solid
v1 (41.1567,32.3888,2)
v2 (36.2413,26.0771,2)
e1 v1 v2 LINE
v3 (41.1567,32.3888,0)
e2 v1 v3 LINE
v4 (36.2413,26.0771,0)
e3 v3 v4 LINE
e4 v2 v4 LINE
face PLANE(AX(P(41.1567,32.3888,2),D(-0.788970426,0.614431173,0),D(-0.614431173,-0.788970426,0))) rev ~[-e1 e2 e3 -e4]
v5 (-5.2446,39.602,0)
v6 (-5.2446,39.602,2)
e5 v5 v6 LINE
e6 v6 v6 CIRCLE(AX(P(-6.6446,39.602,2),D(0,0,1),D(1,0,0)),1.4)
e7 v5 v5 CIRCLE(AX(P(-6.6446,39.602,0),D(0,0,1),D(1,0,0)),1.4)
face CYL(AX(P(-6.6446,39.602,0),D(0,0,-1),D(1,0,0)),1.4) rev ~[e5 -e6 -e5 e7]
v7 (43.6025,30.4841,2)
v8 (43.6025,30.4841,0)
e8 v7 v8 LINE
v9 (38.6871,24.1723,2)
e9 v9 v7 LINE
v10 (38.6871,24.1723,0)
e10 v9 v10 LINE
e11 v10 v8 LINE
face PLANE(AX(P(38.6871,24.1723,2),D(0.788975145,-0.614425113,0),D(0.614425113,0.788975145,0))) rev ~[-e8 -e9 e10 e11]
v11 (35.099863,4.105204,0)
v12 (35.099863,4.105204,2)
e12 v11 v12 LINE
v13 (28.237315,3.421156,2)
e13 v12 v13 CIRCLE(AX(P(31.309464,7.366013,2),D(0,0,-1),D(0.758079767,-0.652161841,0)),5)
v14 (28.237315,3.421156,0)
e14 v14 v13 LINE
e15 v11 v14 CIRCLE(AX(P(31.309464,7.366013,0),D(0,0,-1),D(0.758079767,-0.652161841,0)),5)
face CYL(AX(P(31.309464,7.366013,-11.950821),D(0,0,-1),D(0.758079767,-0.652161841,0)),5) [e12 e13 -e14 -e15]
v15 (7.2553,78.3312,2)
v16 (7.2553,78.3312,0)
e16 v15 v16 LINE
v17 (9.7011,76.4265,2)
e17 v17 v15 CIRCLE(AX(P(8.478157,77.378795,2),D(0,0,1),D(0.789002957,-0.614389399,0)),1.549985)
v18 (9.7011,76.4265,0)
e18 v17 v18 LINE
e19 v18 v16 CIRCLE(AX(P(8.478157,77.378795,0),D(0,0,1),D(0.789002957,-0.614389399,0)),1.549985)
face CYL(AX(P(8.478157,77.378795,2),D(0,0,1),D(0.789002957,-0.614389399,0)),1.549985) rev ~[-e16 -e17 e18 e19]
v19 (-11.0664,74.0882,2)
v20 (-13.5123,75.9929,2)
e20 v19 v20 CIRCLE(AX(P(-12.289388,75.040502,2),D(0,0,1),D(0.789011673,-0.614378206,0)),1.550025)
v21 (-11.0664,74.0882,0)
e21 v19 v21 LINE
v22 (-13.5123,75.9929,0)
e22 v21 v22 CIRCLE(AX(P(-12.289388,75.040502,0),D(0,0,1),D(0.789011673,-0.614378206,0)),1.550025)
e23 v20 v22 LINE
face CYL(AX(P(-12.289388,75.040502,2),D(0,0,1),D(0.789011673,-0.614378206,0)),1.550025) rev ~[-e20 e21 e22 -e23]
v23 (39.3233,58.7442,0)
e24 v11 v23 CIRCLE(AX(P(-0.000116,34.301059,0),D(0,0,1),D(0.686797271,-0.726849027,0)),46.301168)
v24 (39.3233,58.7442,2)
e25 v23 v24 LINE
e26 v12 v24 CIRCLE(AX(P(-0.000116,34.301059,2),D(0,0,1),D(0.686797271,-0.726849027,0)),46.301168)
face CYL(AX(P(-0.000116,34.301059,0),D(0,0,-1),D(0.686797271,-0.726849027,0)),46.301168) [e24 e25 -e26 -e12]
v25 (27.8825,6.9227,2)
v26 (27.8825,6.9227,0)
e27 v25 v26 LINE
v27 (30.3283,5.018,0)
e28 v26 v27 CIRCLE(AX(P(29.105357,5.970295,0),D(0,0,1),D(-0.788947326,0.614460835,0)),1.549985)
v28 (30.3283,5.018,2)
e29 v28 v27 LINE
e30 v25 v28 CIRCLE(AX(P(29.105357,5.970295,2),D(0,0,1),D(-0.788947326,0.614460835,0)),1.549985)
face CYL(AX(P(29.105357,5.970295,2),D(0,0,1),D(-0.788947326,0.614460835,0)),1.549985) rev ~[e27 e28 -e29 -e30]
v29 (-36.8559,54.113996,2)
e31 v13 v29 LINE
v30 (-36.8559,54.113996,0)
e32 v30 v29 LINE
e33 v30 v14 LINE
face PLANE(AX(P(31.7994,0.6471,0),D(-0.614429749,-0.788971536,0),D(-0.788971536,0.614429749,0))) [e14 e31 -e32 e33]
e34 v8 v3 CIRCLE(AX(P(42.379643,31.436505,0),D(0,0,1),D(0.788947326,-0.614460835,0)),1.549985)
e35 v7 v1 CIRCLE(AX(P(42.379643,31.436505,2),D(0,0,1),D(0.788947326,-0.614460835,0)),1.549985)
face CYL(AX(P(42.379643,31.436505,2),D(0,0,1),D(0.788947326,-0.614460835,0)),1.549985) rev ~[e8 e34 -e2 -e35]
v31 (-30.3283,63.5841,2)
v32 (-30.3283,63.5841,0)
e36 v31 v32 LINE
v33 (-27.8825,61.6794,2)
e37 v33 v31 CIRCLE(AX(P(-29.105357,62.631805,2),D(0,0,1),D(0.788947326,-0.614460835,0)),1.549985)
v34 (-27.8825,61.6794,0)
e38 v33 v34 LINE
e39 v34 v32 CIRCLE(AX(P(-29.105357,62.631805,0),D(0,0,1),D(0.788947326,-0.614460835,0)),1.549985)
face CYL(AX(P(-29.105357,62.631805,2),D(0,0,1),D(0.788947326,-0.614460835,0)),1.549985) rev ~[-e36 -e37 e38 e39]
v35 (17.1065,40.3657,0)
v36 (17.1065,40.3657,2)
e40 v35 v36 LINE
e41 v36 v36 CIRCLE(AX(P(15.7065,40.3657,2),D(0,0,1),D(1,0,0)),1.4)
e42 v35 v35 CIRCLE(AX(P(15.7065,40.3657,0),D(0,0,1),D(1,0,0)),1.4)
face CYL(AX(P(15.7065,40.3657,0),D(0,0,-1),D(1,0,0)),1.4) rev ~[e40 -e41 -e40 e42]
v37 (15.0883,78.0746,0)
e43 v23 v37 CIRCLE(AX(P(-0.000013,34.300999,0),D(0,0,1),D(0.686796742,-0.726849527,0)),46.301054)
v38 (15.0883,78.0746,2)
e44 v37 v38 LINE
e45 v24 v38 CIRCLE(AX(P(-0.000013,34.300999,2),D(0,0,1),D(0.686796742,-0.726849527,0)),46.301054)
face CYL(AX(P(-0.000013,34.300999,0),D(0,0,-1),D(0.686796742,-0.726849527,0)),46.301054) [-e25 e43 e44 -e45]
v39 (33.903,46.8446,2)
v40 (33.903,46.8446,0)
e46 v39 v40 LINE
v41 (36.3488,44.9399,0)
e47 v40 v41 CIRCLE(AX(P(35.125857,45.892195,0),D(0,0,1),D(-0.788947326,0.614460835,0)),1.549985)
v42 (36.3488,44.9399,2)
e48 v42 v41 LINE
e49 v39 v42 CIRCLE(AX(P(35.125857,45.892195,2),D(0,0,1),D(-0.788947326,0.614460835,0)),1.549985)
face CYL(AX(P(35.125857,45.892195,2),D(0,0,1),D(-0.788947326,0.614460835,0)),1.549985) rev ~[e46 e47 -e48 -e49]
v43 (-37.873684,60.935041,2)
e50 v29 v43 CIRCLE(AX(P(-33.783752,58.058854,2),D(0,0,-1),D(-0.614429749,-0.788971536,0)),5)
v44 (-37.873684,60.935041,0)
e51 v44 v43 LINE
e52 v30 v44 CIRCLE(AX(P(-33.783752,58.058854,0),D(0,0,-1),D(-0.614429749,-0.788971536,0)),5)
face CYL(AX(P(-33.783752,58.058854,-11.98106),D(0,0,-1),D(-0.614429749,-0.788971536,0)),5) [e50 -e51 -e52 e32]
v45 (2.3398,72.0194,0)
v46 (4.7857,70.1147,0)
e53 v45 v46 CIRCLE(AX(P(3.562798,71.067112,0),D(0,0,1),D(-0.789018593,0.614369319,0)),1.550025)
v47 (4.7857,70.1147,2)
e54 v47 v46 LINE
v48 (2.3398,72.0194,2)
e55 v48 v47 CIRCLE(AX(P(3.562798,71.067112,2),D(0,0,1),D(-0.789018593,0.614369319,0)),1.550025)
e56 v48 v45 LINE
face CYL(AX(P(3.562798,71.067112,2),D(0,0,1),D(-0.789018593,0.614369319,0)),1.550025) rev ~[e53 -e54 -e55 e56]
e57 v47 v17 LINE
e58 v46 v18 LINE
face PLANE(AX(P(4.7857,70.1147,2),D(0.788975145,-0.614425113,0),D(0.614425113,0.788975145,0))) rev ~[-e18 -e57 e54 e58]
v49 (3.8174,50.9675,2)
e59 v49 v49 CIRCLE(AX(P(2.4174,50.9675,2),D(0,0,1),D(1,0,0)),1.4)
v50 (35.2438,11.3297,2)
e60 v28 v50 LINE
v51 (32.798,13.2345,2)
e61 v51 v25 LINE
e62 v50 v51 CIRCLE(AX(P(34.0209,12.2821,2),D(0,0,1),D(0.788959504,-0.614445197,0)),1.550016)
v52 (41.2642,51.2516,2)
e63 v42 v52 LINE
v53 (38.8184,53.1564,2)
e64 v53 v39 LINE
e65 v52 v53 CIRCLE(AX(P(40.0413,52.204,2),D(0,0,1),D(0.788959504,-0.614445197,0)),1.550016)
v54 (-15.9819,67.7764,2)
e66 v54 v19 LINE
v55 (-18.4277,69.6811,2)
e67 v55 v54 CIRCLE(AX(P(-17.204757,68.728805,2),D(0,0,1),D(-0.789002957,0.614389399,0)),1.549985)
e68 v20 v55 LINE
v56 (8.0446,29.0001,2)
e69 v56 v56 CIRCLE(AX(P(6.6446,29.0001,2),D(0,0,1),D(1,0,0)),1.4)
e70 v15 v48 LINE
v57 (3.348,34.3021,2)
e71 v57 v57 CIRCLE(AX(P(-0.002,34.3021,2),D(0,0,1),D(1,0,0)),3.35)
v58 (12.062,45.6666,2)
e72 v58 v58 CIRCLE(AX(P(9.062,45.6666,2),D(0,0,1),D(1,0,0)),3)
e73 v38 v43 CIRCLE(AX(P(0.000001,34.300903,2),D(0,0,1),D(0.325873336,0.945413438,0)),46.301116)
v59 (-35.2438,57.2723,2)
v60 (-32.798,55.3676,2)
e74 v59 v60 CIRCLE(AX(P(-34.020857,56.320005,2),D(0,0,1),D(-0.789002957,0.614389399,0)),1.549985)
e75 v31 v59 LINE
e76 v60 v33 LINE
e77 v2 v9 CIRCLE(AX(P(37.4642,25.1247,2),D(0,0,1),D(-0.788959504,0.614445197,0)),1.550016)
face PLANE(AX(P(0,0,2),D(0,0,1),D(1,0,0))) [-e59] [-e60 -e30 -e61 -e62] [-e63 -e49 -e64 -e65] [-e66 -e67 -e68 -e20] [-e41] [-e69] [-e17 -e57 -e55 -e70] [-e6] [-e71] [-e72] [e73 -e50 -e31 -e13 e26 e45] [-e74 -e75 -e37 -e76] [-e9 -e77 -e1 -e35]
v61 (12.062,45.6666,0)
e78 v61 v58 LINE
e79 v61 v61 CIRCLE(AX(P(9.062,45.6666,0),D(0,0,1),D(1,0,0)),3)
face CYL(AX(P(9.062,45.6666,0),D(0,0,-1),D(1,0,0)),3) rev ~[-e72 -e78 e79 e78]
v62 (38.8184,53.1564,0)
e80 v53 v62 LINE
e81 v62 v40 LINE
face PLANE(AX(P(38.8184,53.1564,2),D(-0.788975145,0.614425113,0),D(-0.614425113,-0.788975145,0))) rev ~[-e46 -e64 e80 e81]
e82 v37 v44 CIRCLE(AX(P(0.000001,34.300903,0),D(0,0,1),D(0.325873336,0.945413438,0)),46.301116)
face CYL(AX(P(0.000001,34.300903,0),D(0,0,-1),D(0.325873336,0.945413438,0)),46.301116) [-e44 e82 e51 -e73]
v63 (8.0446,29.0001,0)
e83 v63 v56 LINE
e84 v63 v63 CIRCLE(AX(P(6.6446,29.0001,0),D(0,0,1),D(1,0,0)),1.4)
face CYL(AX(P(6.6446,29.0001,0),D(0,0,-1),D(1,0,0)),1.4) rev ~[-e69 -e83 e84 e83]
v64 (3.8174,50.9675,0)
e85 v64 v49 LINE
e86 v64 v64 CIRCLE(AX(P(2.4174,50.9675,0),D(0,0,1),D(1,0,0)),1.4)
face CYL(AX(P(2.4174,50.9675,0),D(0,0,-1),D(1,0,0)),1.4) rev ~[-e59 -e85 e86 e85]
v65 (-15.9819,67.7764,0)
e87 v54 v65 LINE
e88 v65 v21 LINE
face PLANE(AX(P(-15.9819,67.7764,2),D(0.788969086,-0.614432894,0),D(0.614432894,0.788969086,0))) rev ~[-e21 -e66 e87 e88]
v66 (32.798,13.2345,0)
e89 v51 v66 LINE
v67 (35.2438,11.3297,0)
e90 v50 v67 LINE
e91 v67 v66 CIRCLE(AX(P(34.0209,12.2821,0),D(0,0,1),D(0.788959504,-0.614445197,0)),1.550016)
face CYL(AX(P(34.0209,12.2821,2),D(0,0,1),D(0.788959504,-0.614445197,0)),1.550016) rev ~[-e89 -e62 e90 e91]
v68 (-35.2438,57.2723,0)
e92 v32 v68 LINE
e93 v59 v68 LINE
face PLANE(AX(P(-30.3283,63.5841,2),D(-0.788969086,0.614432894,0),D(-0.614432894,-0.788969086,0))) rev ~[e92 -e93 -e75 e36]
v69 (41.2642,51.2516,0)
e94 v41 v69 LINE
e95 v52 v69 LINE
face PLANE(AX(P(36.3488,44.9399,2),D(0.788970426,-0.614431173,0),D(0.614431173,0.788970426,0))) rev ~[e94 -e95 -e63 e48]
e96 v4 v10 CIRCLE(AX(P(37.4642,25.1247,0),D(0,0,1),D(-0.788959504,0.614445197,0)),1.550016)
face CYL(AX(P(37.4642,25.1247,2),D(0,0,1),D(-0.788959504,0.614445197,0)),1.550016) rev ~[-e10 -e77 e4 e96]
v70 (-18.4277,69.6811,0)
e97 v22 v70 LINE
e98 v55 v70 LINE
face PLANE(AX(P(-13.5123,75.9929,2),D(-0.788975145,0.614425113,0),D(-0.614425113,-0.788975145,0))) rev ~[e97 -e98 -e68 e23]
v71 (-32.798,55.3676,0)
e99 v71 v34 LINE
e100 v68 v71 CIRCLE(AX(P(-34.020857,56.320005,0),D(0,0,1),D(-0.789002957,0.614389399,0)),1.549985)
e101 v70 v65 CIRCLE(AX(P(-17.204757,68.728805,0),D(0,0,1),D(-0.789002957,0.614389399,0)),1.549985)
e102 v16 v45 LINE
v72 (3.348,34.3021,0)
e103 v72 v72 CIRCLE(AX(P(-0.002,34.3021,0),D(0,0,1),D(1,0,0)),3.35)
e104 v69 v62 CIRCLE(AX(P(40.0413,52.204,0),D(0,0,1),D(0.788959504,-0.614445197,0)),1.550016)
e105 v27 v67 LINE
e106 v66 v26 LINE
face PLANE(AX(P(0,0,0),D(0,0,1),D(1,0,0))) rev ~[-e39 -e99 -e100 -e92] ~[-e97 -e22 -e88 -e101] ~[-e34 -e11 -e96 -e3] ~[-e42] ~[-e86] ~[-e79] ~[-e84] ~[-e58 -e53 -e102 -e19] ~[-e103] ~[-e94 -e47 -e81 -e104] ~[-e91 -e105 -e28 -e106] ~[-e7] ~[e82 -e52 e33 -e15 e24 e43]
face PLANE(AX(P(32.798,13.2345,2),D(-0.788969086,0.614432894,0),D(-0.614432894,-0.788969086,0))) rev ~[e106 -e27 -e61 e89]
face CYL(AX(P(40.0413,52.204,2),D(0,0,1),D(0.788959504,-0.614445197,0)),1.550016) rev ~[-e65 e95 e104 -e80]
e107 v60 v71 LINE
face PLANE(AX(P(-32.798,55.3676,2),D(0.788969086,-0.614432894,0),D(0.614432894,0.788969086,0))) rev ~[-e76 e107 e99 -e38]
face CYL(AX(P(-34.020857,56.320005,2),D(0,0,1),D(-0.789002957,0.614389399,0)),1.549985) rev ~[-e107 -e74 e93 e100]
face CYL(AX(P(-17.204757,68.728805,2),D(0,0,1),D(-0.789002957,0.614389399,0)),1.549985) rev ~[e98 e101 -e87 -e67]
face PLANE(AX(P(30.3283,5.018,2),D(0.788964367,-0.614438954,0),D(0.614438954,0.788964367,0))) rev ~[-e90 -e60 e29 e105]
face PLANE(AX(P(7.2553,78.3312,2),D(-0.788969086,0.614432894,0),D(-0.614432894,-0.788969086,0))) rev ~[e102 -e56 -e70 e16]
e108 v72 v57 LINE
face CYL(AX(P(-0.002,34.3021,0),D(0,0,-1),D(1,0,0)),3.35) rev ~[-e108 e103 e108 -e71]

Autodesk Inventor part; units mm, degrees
ref_plane "YZ Plane" through (0, 0, 0) normal (1, 0, 0) x (0, 1, 0)
ref_plane "XZ Plane" through (0, 0, 0) normal (0, 1, 0) x (-1, 0, 0)
ref_plane "XY Plane" through (0, 0, 0) normal (0, 0, 1) x (1, 0, 0)
ref_plane "Arbeitsebene1" through (0, 0, 0) normal (0, 0, 1) x (1, 0, 0)
sketch "Skizze1" plane through (0, 0, 0) normal (0, 0, 1) x (1, 0, 0)
  line L0 (39.3233, 58.7442) -> (31.1975, 48.5587) projected
  arc A0 (20.3661, 6.7006) -> (31.1975, 48.5587) centre (0, 34.301) ccw projected
  line L1 (20.3661, 6.7006) -> (24.3422, 1.3125) projected
  arc A1 (24.3422, 1.3125) -> (31.7994, 0.6471) centre (28.3654, 4.2814) ccw projected
  arc A2 (31.7994, 0.6471) -> (39.3233, 58.7442) centre (0, 34.301) ccw projected
  circle A3 centre (37.5836, 49.0481) radius 1.4 projected
  circle A4 centre (39.9219, 28.2806) radius 1.4 projected
  circle A5 centre (31.5631, 9.1262) radius 1.4 projected
  line L2 (6.9617, 67.8882) -> (15.0883, 78.0746) projected
  arc A6 (15.0883, 78.0746) -> (-39.8826, 57.8205) centre (0, 34.301) ccw projected
  arc A7 (-39.8826, 57.8205) -> (-37.5755, 50.698) centre (-35.5757, 55.2807) ccw projected
  line L3 (-37.5755, 50.698) -> (-31.4381, 48.0198) projected
  arc A8 (6.9617, 67.8882) -> (-31.4381, 48.0198) centre (0, 34.301) ccw projected
  circle A9 centre (-31.5631, 59.4759) radius 1.4 projected
  circle A10 centre (-14.7471, 71.8847) radius 1.4 projected
  circle A11 centre (6.0205, 74.2229) radius 1.4 projected
  circle A12 centre (-0.002, 34.3021) radius 3.35 projected
  circle A13 centre (9.062, 45.6666) radius 3 projected
  circle A14 centre (2.4174, 50.9675) radius 1.9 projected
  circle A15 centre (15.7065, 40.3657) radius 1.9 projected
  circle A16 centre (6.6446, 29.0001) radius 1.9 projected
  circle A17 centre (-6.6446, 39.602) radius 1.9 projected
  line L4 (31.7994, 0.6471) -> (-40.3324, 56.8214)
  arc A18 (20.3661, 6.7006) -> (-31.4381, 48.0198) centre (0, 34.301) ccw projected
  arc A19 (31.7994, 0.6471) -> (-39.8826, 57.8205) centre (0, 34.301) ccw projected
  circle A20 centre (15.7065, 40.3657) radius 1.4
  circle A21 centre (6.6446, 29.0001) radius 1.4
  circle A22 centre (-6.6446, 39.602) radius 1.4
  circle A23 centre (2.4174, 50.9675) radius 1.4
  point P0 (0, 0)
  dimension "d2" = 2.8
  dimension "d3" = 2.8
  dimension "d4" = 2.8
  dimension "d5" = 2.8
extrude "Extrusion1" add sketch "Skizze1" along normal blind 2 contours A2 L4 A0 L0 | L0 A18 L2 A19 | A0 L4 A8 A18 | L2 A8 L4 A7 A6 | A14 | A15 | A16 | A17
sketch "Skizze2" plane through (0, 0, 2) normal (0, 0, 1) x (1, 0, 0)
  arc A0 (31.7994, 0.6471) -> (-39.8826, 57.8205) centre (0, 34.301) ccw projected
  arc A1 (-39.8826, 57.8205) -> (-40.3324, 56.8214) centre (-35.5757, 55.2807) ccw projected
  line L0 (-40.3324, 56.8214) -> (31.7994, 0.6471) projected
  circle A2 centre (31.5631, 9.1262) radius 1.4 projected
  circle A3 centre (39.9219, 28.2806) radius 1.4 projected
  circle A4 centre (37.5836, 49.0481) radius 1.4 projected
  circle A5 centre (-31.5631, 59.4759) radius 1.4 projected
  circle A6 centre (-14.7471, 71.8847) radius 1.4 projected
  circle A7 centre (6.0205, 74.2229) radius 1.4 projected
  circle A8 centre (9.062, 45.6666) radius 3 projected
  circle A9 centre (-0.002, 34.3021) radius 3.35 projected
  circle A10 centre (15.7065, 40.3657) radius 1.4 projected
  circle A11 centre (2.4174, 50.9675) radius 1.4 projected
  circle A12 centre (-6.6446, 39.602) radius 1.4 projected
  circle A13 centre (6.6446, 29.0001) radius 1.4 projected
  line L1 (29.1054, 5.9703) -> (34.0209, 12.2821) construction
  circle A14 centre (31.5631, 9.1262) radius 1.4 projected
  line L2 (30.3283, 5.018) -> (35.2438, 11.3297)
  line L3 (32.798, 13.2345) -> (27.8825, 6.9227)
  arc A15 (27.8825, 6.9227) -> (30.3283, 5.018) centre (29.1054, 5.9703) ccw
  arc A16 (35.2438, 11.3297) -> (32.798, 13.2345) centre (34.0209, 12.2821) ccw
  line L4 (37.4642, 25.1247) -> (42.3796, 31.4365) construction
  line L5 (38.6871, 24.1723) -> (43.6025, 30.4841)
  line L6 (41.1567, 32.3888) -> (36.2413, 26.0771)
  arc A17 (36.2413, 26.0771) -> (38.6871, 24.1723) centre (37.4642, 25.1247) ccw
  arc A18 (43.6025, 30.4841) -> (41.1567, 32.3888) centre (42.3796, 31.4365) ccw
  line L7 (35.1259, 45.8922) -> (40.0413, 52.204) construction
  line L8 (36.3488, 44.9399) -> (41.2642, 51.2516)
  line L9 (38.8184, 53.1564) -> (33.903, 46.8446)
  arc A19 (33.903, 46.8446) -> (36.3488, 44.9399) centre (35.1259, 45.8922) ccw
  arc A20 (41.2642, 51.2516) -> (38.8184, 53.1564) centre (40.0413, 52.204) ccw
  line L10 (3.5627, 71.0671) -> (8.4782, 77.3788) construction
  line L11 (4.7857, 70.1147) -> (9.7011, 76.4265)
  line L12 (7.2553, 78.3312) -> (2.3398, 72.0194)
  arc A21 (2.3398, 72.0194) -> (4.7857, 70.1147) centre (3.5627, 71.0671) ccw
  arc A22 (9.7011, 76.4265) -> (7.2553, 78.3312) centre (8.4782, 77.3788) ccw
  line L13 (-17.2048, 68.7288) -> (-12.2894, 75.0405) construction
  line L14 (-15.9819, 67.7764) -> (-11.0664, 74.0882)
  line L15 (-13.5123, 75.9929) -> (-18.4277, 69.6811)
  arc A23 (-18.4277, 69.6811) -> (-15.9819, 67.7764) centre (-17.2048, 68.7288) ccw
  arc A24 (-11.0664, 74.0882) -> (-13.5123, 75.9929) centre (-12.2894, 75.0405) ccw
  line L16 (-34.0209, 56.32) -> (-29.1054, 62.6318) construction
  line L17 (-32.798, 55.3676) -> (-27.8825, 61.6794)
  line L18 (-30.3283, 63.5841) -> (-35.2438, 57.2723)
  arc A25 (-35.2438, 57.2723) -> (-32.798, 55.3676) centre (-34.0209, 56.32) ccw
  arc A26 (-27.8825, 61.6794) -> (-30.3283, 63.5841) centre (-29.1054, 62.6318) ccw
  line L19 (29.1054, 5.9703) -> (34.0209, 12.2821) construction
  line L20 (30.3283, 5.018) -> (35.2438, 11.3297)
  line L21 (32.798, 13.2345) -> (27.8825, 6.9227)
  arc A27 (27.8825, 6.9227) -> (30.3283, 5.018) centre (29.1054, 5.9703) ccw
  arc A28 (35.2438, 11.3297) -> (32.798, 13.2345) centre (34.0209, 12.2821) ccw
  point P0 (0, 0)
  dimension "d6" = 4
  dimension "d7" = 3.1
  dimension "d8" = 3.1
  dimension "d9" = 3.1
  dimension "d10" = 3.1
  dimension "d11" = 3.1
  dimension "d12" = 3.1
  dimension "d13" = 3.1
extrude "Extrusion2" cut sketch "Skizze2" against normal blind 2 contours A7 | A15 L3 A16 L2 | A17 L6 A18 L5 | A19 L9 A20 L8 | A21 L12 A22 L11 | A23 L15 A24 L14 | A25 L18 A26 L17
fillet "Rundung1" radius 5 2 edges at (-40.3324, 56.8214, 1) (31.7994, 0.6471, 1)
properties part number "Anglerfish_Lightplate_Tosslink_adjuster_flipped"
